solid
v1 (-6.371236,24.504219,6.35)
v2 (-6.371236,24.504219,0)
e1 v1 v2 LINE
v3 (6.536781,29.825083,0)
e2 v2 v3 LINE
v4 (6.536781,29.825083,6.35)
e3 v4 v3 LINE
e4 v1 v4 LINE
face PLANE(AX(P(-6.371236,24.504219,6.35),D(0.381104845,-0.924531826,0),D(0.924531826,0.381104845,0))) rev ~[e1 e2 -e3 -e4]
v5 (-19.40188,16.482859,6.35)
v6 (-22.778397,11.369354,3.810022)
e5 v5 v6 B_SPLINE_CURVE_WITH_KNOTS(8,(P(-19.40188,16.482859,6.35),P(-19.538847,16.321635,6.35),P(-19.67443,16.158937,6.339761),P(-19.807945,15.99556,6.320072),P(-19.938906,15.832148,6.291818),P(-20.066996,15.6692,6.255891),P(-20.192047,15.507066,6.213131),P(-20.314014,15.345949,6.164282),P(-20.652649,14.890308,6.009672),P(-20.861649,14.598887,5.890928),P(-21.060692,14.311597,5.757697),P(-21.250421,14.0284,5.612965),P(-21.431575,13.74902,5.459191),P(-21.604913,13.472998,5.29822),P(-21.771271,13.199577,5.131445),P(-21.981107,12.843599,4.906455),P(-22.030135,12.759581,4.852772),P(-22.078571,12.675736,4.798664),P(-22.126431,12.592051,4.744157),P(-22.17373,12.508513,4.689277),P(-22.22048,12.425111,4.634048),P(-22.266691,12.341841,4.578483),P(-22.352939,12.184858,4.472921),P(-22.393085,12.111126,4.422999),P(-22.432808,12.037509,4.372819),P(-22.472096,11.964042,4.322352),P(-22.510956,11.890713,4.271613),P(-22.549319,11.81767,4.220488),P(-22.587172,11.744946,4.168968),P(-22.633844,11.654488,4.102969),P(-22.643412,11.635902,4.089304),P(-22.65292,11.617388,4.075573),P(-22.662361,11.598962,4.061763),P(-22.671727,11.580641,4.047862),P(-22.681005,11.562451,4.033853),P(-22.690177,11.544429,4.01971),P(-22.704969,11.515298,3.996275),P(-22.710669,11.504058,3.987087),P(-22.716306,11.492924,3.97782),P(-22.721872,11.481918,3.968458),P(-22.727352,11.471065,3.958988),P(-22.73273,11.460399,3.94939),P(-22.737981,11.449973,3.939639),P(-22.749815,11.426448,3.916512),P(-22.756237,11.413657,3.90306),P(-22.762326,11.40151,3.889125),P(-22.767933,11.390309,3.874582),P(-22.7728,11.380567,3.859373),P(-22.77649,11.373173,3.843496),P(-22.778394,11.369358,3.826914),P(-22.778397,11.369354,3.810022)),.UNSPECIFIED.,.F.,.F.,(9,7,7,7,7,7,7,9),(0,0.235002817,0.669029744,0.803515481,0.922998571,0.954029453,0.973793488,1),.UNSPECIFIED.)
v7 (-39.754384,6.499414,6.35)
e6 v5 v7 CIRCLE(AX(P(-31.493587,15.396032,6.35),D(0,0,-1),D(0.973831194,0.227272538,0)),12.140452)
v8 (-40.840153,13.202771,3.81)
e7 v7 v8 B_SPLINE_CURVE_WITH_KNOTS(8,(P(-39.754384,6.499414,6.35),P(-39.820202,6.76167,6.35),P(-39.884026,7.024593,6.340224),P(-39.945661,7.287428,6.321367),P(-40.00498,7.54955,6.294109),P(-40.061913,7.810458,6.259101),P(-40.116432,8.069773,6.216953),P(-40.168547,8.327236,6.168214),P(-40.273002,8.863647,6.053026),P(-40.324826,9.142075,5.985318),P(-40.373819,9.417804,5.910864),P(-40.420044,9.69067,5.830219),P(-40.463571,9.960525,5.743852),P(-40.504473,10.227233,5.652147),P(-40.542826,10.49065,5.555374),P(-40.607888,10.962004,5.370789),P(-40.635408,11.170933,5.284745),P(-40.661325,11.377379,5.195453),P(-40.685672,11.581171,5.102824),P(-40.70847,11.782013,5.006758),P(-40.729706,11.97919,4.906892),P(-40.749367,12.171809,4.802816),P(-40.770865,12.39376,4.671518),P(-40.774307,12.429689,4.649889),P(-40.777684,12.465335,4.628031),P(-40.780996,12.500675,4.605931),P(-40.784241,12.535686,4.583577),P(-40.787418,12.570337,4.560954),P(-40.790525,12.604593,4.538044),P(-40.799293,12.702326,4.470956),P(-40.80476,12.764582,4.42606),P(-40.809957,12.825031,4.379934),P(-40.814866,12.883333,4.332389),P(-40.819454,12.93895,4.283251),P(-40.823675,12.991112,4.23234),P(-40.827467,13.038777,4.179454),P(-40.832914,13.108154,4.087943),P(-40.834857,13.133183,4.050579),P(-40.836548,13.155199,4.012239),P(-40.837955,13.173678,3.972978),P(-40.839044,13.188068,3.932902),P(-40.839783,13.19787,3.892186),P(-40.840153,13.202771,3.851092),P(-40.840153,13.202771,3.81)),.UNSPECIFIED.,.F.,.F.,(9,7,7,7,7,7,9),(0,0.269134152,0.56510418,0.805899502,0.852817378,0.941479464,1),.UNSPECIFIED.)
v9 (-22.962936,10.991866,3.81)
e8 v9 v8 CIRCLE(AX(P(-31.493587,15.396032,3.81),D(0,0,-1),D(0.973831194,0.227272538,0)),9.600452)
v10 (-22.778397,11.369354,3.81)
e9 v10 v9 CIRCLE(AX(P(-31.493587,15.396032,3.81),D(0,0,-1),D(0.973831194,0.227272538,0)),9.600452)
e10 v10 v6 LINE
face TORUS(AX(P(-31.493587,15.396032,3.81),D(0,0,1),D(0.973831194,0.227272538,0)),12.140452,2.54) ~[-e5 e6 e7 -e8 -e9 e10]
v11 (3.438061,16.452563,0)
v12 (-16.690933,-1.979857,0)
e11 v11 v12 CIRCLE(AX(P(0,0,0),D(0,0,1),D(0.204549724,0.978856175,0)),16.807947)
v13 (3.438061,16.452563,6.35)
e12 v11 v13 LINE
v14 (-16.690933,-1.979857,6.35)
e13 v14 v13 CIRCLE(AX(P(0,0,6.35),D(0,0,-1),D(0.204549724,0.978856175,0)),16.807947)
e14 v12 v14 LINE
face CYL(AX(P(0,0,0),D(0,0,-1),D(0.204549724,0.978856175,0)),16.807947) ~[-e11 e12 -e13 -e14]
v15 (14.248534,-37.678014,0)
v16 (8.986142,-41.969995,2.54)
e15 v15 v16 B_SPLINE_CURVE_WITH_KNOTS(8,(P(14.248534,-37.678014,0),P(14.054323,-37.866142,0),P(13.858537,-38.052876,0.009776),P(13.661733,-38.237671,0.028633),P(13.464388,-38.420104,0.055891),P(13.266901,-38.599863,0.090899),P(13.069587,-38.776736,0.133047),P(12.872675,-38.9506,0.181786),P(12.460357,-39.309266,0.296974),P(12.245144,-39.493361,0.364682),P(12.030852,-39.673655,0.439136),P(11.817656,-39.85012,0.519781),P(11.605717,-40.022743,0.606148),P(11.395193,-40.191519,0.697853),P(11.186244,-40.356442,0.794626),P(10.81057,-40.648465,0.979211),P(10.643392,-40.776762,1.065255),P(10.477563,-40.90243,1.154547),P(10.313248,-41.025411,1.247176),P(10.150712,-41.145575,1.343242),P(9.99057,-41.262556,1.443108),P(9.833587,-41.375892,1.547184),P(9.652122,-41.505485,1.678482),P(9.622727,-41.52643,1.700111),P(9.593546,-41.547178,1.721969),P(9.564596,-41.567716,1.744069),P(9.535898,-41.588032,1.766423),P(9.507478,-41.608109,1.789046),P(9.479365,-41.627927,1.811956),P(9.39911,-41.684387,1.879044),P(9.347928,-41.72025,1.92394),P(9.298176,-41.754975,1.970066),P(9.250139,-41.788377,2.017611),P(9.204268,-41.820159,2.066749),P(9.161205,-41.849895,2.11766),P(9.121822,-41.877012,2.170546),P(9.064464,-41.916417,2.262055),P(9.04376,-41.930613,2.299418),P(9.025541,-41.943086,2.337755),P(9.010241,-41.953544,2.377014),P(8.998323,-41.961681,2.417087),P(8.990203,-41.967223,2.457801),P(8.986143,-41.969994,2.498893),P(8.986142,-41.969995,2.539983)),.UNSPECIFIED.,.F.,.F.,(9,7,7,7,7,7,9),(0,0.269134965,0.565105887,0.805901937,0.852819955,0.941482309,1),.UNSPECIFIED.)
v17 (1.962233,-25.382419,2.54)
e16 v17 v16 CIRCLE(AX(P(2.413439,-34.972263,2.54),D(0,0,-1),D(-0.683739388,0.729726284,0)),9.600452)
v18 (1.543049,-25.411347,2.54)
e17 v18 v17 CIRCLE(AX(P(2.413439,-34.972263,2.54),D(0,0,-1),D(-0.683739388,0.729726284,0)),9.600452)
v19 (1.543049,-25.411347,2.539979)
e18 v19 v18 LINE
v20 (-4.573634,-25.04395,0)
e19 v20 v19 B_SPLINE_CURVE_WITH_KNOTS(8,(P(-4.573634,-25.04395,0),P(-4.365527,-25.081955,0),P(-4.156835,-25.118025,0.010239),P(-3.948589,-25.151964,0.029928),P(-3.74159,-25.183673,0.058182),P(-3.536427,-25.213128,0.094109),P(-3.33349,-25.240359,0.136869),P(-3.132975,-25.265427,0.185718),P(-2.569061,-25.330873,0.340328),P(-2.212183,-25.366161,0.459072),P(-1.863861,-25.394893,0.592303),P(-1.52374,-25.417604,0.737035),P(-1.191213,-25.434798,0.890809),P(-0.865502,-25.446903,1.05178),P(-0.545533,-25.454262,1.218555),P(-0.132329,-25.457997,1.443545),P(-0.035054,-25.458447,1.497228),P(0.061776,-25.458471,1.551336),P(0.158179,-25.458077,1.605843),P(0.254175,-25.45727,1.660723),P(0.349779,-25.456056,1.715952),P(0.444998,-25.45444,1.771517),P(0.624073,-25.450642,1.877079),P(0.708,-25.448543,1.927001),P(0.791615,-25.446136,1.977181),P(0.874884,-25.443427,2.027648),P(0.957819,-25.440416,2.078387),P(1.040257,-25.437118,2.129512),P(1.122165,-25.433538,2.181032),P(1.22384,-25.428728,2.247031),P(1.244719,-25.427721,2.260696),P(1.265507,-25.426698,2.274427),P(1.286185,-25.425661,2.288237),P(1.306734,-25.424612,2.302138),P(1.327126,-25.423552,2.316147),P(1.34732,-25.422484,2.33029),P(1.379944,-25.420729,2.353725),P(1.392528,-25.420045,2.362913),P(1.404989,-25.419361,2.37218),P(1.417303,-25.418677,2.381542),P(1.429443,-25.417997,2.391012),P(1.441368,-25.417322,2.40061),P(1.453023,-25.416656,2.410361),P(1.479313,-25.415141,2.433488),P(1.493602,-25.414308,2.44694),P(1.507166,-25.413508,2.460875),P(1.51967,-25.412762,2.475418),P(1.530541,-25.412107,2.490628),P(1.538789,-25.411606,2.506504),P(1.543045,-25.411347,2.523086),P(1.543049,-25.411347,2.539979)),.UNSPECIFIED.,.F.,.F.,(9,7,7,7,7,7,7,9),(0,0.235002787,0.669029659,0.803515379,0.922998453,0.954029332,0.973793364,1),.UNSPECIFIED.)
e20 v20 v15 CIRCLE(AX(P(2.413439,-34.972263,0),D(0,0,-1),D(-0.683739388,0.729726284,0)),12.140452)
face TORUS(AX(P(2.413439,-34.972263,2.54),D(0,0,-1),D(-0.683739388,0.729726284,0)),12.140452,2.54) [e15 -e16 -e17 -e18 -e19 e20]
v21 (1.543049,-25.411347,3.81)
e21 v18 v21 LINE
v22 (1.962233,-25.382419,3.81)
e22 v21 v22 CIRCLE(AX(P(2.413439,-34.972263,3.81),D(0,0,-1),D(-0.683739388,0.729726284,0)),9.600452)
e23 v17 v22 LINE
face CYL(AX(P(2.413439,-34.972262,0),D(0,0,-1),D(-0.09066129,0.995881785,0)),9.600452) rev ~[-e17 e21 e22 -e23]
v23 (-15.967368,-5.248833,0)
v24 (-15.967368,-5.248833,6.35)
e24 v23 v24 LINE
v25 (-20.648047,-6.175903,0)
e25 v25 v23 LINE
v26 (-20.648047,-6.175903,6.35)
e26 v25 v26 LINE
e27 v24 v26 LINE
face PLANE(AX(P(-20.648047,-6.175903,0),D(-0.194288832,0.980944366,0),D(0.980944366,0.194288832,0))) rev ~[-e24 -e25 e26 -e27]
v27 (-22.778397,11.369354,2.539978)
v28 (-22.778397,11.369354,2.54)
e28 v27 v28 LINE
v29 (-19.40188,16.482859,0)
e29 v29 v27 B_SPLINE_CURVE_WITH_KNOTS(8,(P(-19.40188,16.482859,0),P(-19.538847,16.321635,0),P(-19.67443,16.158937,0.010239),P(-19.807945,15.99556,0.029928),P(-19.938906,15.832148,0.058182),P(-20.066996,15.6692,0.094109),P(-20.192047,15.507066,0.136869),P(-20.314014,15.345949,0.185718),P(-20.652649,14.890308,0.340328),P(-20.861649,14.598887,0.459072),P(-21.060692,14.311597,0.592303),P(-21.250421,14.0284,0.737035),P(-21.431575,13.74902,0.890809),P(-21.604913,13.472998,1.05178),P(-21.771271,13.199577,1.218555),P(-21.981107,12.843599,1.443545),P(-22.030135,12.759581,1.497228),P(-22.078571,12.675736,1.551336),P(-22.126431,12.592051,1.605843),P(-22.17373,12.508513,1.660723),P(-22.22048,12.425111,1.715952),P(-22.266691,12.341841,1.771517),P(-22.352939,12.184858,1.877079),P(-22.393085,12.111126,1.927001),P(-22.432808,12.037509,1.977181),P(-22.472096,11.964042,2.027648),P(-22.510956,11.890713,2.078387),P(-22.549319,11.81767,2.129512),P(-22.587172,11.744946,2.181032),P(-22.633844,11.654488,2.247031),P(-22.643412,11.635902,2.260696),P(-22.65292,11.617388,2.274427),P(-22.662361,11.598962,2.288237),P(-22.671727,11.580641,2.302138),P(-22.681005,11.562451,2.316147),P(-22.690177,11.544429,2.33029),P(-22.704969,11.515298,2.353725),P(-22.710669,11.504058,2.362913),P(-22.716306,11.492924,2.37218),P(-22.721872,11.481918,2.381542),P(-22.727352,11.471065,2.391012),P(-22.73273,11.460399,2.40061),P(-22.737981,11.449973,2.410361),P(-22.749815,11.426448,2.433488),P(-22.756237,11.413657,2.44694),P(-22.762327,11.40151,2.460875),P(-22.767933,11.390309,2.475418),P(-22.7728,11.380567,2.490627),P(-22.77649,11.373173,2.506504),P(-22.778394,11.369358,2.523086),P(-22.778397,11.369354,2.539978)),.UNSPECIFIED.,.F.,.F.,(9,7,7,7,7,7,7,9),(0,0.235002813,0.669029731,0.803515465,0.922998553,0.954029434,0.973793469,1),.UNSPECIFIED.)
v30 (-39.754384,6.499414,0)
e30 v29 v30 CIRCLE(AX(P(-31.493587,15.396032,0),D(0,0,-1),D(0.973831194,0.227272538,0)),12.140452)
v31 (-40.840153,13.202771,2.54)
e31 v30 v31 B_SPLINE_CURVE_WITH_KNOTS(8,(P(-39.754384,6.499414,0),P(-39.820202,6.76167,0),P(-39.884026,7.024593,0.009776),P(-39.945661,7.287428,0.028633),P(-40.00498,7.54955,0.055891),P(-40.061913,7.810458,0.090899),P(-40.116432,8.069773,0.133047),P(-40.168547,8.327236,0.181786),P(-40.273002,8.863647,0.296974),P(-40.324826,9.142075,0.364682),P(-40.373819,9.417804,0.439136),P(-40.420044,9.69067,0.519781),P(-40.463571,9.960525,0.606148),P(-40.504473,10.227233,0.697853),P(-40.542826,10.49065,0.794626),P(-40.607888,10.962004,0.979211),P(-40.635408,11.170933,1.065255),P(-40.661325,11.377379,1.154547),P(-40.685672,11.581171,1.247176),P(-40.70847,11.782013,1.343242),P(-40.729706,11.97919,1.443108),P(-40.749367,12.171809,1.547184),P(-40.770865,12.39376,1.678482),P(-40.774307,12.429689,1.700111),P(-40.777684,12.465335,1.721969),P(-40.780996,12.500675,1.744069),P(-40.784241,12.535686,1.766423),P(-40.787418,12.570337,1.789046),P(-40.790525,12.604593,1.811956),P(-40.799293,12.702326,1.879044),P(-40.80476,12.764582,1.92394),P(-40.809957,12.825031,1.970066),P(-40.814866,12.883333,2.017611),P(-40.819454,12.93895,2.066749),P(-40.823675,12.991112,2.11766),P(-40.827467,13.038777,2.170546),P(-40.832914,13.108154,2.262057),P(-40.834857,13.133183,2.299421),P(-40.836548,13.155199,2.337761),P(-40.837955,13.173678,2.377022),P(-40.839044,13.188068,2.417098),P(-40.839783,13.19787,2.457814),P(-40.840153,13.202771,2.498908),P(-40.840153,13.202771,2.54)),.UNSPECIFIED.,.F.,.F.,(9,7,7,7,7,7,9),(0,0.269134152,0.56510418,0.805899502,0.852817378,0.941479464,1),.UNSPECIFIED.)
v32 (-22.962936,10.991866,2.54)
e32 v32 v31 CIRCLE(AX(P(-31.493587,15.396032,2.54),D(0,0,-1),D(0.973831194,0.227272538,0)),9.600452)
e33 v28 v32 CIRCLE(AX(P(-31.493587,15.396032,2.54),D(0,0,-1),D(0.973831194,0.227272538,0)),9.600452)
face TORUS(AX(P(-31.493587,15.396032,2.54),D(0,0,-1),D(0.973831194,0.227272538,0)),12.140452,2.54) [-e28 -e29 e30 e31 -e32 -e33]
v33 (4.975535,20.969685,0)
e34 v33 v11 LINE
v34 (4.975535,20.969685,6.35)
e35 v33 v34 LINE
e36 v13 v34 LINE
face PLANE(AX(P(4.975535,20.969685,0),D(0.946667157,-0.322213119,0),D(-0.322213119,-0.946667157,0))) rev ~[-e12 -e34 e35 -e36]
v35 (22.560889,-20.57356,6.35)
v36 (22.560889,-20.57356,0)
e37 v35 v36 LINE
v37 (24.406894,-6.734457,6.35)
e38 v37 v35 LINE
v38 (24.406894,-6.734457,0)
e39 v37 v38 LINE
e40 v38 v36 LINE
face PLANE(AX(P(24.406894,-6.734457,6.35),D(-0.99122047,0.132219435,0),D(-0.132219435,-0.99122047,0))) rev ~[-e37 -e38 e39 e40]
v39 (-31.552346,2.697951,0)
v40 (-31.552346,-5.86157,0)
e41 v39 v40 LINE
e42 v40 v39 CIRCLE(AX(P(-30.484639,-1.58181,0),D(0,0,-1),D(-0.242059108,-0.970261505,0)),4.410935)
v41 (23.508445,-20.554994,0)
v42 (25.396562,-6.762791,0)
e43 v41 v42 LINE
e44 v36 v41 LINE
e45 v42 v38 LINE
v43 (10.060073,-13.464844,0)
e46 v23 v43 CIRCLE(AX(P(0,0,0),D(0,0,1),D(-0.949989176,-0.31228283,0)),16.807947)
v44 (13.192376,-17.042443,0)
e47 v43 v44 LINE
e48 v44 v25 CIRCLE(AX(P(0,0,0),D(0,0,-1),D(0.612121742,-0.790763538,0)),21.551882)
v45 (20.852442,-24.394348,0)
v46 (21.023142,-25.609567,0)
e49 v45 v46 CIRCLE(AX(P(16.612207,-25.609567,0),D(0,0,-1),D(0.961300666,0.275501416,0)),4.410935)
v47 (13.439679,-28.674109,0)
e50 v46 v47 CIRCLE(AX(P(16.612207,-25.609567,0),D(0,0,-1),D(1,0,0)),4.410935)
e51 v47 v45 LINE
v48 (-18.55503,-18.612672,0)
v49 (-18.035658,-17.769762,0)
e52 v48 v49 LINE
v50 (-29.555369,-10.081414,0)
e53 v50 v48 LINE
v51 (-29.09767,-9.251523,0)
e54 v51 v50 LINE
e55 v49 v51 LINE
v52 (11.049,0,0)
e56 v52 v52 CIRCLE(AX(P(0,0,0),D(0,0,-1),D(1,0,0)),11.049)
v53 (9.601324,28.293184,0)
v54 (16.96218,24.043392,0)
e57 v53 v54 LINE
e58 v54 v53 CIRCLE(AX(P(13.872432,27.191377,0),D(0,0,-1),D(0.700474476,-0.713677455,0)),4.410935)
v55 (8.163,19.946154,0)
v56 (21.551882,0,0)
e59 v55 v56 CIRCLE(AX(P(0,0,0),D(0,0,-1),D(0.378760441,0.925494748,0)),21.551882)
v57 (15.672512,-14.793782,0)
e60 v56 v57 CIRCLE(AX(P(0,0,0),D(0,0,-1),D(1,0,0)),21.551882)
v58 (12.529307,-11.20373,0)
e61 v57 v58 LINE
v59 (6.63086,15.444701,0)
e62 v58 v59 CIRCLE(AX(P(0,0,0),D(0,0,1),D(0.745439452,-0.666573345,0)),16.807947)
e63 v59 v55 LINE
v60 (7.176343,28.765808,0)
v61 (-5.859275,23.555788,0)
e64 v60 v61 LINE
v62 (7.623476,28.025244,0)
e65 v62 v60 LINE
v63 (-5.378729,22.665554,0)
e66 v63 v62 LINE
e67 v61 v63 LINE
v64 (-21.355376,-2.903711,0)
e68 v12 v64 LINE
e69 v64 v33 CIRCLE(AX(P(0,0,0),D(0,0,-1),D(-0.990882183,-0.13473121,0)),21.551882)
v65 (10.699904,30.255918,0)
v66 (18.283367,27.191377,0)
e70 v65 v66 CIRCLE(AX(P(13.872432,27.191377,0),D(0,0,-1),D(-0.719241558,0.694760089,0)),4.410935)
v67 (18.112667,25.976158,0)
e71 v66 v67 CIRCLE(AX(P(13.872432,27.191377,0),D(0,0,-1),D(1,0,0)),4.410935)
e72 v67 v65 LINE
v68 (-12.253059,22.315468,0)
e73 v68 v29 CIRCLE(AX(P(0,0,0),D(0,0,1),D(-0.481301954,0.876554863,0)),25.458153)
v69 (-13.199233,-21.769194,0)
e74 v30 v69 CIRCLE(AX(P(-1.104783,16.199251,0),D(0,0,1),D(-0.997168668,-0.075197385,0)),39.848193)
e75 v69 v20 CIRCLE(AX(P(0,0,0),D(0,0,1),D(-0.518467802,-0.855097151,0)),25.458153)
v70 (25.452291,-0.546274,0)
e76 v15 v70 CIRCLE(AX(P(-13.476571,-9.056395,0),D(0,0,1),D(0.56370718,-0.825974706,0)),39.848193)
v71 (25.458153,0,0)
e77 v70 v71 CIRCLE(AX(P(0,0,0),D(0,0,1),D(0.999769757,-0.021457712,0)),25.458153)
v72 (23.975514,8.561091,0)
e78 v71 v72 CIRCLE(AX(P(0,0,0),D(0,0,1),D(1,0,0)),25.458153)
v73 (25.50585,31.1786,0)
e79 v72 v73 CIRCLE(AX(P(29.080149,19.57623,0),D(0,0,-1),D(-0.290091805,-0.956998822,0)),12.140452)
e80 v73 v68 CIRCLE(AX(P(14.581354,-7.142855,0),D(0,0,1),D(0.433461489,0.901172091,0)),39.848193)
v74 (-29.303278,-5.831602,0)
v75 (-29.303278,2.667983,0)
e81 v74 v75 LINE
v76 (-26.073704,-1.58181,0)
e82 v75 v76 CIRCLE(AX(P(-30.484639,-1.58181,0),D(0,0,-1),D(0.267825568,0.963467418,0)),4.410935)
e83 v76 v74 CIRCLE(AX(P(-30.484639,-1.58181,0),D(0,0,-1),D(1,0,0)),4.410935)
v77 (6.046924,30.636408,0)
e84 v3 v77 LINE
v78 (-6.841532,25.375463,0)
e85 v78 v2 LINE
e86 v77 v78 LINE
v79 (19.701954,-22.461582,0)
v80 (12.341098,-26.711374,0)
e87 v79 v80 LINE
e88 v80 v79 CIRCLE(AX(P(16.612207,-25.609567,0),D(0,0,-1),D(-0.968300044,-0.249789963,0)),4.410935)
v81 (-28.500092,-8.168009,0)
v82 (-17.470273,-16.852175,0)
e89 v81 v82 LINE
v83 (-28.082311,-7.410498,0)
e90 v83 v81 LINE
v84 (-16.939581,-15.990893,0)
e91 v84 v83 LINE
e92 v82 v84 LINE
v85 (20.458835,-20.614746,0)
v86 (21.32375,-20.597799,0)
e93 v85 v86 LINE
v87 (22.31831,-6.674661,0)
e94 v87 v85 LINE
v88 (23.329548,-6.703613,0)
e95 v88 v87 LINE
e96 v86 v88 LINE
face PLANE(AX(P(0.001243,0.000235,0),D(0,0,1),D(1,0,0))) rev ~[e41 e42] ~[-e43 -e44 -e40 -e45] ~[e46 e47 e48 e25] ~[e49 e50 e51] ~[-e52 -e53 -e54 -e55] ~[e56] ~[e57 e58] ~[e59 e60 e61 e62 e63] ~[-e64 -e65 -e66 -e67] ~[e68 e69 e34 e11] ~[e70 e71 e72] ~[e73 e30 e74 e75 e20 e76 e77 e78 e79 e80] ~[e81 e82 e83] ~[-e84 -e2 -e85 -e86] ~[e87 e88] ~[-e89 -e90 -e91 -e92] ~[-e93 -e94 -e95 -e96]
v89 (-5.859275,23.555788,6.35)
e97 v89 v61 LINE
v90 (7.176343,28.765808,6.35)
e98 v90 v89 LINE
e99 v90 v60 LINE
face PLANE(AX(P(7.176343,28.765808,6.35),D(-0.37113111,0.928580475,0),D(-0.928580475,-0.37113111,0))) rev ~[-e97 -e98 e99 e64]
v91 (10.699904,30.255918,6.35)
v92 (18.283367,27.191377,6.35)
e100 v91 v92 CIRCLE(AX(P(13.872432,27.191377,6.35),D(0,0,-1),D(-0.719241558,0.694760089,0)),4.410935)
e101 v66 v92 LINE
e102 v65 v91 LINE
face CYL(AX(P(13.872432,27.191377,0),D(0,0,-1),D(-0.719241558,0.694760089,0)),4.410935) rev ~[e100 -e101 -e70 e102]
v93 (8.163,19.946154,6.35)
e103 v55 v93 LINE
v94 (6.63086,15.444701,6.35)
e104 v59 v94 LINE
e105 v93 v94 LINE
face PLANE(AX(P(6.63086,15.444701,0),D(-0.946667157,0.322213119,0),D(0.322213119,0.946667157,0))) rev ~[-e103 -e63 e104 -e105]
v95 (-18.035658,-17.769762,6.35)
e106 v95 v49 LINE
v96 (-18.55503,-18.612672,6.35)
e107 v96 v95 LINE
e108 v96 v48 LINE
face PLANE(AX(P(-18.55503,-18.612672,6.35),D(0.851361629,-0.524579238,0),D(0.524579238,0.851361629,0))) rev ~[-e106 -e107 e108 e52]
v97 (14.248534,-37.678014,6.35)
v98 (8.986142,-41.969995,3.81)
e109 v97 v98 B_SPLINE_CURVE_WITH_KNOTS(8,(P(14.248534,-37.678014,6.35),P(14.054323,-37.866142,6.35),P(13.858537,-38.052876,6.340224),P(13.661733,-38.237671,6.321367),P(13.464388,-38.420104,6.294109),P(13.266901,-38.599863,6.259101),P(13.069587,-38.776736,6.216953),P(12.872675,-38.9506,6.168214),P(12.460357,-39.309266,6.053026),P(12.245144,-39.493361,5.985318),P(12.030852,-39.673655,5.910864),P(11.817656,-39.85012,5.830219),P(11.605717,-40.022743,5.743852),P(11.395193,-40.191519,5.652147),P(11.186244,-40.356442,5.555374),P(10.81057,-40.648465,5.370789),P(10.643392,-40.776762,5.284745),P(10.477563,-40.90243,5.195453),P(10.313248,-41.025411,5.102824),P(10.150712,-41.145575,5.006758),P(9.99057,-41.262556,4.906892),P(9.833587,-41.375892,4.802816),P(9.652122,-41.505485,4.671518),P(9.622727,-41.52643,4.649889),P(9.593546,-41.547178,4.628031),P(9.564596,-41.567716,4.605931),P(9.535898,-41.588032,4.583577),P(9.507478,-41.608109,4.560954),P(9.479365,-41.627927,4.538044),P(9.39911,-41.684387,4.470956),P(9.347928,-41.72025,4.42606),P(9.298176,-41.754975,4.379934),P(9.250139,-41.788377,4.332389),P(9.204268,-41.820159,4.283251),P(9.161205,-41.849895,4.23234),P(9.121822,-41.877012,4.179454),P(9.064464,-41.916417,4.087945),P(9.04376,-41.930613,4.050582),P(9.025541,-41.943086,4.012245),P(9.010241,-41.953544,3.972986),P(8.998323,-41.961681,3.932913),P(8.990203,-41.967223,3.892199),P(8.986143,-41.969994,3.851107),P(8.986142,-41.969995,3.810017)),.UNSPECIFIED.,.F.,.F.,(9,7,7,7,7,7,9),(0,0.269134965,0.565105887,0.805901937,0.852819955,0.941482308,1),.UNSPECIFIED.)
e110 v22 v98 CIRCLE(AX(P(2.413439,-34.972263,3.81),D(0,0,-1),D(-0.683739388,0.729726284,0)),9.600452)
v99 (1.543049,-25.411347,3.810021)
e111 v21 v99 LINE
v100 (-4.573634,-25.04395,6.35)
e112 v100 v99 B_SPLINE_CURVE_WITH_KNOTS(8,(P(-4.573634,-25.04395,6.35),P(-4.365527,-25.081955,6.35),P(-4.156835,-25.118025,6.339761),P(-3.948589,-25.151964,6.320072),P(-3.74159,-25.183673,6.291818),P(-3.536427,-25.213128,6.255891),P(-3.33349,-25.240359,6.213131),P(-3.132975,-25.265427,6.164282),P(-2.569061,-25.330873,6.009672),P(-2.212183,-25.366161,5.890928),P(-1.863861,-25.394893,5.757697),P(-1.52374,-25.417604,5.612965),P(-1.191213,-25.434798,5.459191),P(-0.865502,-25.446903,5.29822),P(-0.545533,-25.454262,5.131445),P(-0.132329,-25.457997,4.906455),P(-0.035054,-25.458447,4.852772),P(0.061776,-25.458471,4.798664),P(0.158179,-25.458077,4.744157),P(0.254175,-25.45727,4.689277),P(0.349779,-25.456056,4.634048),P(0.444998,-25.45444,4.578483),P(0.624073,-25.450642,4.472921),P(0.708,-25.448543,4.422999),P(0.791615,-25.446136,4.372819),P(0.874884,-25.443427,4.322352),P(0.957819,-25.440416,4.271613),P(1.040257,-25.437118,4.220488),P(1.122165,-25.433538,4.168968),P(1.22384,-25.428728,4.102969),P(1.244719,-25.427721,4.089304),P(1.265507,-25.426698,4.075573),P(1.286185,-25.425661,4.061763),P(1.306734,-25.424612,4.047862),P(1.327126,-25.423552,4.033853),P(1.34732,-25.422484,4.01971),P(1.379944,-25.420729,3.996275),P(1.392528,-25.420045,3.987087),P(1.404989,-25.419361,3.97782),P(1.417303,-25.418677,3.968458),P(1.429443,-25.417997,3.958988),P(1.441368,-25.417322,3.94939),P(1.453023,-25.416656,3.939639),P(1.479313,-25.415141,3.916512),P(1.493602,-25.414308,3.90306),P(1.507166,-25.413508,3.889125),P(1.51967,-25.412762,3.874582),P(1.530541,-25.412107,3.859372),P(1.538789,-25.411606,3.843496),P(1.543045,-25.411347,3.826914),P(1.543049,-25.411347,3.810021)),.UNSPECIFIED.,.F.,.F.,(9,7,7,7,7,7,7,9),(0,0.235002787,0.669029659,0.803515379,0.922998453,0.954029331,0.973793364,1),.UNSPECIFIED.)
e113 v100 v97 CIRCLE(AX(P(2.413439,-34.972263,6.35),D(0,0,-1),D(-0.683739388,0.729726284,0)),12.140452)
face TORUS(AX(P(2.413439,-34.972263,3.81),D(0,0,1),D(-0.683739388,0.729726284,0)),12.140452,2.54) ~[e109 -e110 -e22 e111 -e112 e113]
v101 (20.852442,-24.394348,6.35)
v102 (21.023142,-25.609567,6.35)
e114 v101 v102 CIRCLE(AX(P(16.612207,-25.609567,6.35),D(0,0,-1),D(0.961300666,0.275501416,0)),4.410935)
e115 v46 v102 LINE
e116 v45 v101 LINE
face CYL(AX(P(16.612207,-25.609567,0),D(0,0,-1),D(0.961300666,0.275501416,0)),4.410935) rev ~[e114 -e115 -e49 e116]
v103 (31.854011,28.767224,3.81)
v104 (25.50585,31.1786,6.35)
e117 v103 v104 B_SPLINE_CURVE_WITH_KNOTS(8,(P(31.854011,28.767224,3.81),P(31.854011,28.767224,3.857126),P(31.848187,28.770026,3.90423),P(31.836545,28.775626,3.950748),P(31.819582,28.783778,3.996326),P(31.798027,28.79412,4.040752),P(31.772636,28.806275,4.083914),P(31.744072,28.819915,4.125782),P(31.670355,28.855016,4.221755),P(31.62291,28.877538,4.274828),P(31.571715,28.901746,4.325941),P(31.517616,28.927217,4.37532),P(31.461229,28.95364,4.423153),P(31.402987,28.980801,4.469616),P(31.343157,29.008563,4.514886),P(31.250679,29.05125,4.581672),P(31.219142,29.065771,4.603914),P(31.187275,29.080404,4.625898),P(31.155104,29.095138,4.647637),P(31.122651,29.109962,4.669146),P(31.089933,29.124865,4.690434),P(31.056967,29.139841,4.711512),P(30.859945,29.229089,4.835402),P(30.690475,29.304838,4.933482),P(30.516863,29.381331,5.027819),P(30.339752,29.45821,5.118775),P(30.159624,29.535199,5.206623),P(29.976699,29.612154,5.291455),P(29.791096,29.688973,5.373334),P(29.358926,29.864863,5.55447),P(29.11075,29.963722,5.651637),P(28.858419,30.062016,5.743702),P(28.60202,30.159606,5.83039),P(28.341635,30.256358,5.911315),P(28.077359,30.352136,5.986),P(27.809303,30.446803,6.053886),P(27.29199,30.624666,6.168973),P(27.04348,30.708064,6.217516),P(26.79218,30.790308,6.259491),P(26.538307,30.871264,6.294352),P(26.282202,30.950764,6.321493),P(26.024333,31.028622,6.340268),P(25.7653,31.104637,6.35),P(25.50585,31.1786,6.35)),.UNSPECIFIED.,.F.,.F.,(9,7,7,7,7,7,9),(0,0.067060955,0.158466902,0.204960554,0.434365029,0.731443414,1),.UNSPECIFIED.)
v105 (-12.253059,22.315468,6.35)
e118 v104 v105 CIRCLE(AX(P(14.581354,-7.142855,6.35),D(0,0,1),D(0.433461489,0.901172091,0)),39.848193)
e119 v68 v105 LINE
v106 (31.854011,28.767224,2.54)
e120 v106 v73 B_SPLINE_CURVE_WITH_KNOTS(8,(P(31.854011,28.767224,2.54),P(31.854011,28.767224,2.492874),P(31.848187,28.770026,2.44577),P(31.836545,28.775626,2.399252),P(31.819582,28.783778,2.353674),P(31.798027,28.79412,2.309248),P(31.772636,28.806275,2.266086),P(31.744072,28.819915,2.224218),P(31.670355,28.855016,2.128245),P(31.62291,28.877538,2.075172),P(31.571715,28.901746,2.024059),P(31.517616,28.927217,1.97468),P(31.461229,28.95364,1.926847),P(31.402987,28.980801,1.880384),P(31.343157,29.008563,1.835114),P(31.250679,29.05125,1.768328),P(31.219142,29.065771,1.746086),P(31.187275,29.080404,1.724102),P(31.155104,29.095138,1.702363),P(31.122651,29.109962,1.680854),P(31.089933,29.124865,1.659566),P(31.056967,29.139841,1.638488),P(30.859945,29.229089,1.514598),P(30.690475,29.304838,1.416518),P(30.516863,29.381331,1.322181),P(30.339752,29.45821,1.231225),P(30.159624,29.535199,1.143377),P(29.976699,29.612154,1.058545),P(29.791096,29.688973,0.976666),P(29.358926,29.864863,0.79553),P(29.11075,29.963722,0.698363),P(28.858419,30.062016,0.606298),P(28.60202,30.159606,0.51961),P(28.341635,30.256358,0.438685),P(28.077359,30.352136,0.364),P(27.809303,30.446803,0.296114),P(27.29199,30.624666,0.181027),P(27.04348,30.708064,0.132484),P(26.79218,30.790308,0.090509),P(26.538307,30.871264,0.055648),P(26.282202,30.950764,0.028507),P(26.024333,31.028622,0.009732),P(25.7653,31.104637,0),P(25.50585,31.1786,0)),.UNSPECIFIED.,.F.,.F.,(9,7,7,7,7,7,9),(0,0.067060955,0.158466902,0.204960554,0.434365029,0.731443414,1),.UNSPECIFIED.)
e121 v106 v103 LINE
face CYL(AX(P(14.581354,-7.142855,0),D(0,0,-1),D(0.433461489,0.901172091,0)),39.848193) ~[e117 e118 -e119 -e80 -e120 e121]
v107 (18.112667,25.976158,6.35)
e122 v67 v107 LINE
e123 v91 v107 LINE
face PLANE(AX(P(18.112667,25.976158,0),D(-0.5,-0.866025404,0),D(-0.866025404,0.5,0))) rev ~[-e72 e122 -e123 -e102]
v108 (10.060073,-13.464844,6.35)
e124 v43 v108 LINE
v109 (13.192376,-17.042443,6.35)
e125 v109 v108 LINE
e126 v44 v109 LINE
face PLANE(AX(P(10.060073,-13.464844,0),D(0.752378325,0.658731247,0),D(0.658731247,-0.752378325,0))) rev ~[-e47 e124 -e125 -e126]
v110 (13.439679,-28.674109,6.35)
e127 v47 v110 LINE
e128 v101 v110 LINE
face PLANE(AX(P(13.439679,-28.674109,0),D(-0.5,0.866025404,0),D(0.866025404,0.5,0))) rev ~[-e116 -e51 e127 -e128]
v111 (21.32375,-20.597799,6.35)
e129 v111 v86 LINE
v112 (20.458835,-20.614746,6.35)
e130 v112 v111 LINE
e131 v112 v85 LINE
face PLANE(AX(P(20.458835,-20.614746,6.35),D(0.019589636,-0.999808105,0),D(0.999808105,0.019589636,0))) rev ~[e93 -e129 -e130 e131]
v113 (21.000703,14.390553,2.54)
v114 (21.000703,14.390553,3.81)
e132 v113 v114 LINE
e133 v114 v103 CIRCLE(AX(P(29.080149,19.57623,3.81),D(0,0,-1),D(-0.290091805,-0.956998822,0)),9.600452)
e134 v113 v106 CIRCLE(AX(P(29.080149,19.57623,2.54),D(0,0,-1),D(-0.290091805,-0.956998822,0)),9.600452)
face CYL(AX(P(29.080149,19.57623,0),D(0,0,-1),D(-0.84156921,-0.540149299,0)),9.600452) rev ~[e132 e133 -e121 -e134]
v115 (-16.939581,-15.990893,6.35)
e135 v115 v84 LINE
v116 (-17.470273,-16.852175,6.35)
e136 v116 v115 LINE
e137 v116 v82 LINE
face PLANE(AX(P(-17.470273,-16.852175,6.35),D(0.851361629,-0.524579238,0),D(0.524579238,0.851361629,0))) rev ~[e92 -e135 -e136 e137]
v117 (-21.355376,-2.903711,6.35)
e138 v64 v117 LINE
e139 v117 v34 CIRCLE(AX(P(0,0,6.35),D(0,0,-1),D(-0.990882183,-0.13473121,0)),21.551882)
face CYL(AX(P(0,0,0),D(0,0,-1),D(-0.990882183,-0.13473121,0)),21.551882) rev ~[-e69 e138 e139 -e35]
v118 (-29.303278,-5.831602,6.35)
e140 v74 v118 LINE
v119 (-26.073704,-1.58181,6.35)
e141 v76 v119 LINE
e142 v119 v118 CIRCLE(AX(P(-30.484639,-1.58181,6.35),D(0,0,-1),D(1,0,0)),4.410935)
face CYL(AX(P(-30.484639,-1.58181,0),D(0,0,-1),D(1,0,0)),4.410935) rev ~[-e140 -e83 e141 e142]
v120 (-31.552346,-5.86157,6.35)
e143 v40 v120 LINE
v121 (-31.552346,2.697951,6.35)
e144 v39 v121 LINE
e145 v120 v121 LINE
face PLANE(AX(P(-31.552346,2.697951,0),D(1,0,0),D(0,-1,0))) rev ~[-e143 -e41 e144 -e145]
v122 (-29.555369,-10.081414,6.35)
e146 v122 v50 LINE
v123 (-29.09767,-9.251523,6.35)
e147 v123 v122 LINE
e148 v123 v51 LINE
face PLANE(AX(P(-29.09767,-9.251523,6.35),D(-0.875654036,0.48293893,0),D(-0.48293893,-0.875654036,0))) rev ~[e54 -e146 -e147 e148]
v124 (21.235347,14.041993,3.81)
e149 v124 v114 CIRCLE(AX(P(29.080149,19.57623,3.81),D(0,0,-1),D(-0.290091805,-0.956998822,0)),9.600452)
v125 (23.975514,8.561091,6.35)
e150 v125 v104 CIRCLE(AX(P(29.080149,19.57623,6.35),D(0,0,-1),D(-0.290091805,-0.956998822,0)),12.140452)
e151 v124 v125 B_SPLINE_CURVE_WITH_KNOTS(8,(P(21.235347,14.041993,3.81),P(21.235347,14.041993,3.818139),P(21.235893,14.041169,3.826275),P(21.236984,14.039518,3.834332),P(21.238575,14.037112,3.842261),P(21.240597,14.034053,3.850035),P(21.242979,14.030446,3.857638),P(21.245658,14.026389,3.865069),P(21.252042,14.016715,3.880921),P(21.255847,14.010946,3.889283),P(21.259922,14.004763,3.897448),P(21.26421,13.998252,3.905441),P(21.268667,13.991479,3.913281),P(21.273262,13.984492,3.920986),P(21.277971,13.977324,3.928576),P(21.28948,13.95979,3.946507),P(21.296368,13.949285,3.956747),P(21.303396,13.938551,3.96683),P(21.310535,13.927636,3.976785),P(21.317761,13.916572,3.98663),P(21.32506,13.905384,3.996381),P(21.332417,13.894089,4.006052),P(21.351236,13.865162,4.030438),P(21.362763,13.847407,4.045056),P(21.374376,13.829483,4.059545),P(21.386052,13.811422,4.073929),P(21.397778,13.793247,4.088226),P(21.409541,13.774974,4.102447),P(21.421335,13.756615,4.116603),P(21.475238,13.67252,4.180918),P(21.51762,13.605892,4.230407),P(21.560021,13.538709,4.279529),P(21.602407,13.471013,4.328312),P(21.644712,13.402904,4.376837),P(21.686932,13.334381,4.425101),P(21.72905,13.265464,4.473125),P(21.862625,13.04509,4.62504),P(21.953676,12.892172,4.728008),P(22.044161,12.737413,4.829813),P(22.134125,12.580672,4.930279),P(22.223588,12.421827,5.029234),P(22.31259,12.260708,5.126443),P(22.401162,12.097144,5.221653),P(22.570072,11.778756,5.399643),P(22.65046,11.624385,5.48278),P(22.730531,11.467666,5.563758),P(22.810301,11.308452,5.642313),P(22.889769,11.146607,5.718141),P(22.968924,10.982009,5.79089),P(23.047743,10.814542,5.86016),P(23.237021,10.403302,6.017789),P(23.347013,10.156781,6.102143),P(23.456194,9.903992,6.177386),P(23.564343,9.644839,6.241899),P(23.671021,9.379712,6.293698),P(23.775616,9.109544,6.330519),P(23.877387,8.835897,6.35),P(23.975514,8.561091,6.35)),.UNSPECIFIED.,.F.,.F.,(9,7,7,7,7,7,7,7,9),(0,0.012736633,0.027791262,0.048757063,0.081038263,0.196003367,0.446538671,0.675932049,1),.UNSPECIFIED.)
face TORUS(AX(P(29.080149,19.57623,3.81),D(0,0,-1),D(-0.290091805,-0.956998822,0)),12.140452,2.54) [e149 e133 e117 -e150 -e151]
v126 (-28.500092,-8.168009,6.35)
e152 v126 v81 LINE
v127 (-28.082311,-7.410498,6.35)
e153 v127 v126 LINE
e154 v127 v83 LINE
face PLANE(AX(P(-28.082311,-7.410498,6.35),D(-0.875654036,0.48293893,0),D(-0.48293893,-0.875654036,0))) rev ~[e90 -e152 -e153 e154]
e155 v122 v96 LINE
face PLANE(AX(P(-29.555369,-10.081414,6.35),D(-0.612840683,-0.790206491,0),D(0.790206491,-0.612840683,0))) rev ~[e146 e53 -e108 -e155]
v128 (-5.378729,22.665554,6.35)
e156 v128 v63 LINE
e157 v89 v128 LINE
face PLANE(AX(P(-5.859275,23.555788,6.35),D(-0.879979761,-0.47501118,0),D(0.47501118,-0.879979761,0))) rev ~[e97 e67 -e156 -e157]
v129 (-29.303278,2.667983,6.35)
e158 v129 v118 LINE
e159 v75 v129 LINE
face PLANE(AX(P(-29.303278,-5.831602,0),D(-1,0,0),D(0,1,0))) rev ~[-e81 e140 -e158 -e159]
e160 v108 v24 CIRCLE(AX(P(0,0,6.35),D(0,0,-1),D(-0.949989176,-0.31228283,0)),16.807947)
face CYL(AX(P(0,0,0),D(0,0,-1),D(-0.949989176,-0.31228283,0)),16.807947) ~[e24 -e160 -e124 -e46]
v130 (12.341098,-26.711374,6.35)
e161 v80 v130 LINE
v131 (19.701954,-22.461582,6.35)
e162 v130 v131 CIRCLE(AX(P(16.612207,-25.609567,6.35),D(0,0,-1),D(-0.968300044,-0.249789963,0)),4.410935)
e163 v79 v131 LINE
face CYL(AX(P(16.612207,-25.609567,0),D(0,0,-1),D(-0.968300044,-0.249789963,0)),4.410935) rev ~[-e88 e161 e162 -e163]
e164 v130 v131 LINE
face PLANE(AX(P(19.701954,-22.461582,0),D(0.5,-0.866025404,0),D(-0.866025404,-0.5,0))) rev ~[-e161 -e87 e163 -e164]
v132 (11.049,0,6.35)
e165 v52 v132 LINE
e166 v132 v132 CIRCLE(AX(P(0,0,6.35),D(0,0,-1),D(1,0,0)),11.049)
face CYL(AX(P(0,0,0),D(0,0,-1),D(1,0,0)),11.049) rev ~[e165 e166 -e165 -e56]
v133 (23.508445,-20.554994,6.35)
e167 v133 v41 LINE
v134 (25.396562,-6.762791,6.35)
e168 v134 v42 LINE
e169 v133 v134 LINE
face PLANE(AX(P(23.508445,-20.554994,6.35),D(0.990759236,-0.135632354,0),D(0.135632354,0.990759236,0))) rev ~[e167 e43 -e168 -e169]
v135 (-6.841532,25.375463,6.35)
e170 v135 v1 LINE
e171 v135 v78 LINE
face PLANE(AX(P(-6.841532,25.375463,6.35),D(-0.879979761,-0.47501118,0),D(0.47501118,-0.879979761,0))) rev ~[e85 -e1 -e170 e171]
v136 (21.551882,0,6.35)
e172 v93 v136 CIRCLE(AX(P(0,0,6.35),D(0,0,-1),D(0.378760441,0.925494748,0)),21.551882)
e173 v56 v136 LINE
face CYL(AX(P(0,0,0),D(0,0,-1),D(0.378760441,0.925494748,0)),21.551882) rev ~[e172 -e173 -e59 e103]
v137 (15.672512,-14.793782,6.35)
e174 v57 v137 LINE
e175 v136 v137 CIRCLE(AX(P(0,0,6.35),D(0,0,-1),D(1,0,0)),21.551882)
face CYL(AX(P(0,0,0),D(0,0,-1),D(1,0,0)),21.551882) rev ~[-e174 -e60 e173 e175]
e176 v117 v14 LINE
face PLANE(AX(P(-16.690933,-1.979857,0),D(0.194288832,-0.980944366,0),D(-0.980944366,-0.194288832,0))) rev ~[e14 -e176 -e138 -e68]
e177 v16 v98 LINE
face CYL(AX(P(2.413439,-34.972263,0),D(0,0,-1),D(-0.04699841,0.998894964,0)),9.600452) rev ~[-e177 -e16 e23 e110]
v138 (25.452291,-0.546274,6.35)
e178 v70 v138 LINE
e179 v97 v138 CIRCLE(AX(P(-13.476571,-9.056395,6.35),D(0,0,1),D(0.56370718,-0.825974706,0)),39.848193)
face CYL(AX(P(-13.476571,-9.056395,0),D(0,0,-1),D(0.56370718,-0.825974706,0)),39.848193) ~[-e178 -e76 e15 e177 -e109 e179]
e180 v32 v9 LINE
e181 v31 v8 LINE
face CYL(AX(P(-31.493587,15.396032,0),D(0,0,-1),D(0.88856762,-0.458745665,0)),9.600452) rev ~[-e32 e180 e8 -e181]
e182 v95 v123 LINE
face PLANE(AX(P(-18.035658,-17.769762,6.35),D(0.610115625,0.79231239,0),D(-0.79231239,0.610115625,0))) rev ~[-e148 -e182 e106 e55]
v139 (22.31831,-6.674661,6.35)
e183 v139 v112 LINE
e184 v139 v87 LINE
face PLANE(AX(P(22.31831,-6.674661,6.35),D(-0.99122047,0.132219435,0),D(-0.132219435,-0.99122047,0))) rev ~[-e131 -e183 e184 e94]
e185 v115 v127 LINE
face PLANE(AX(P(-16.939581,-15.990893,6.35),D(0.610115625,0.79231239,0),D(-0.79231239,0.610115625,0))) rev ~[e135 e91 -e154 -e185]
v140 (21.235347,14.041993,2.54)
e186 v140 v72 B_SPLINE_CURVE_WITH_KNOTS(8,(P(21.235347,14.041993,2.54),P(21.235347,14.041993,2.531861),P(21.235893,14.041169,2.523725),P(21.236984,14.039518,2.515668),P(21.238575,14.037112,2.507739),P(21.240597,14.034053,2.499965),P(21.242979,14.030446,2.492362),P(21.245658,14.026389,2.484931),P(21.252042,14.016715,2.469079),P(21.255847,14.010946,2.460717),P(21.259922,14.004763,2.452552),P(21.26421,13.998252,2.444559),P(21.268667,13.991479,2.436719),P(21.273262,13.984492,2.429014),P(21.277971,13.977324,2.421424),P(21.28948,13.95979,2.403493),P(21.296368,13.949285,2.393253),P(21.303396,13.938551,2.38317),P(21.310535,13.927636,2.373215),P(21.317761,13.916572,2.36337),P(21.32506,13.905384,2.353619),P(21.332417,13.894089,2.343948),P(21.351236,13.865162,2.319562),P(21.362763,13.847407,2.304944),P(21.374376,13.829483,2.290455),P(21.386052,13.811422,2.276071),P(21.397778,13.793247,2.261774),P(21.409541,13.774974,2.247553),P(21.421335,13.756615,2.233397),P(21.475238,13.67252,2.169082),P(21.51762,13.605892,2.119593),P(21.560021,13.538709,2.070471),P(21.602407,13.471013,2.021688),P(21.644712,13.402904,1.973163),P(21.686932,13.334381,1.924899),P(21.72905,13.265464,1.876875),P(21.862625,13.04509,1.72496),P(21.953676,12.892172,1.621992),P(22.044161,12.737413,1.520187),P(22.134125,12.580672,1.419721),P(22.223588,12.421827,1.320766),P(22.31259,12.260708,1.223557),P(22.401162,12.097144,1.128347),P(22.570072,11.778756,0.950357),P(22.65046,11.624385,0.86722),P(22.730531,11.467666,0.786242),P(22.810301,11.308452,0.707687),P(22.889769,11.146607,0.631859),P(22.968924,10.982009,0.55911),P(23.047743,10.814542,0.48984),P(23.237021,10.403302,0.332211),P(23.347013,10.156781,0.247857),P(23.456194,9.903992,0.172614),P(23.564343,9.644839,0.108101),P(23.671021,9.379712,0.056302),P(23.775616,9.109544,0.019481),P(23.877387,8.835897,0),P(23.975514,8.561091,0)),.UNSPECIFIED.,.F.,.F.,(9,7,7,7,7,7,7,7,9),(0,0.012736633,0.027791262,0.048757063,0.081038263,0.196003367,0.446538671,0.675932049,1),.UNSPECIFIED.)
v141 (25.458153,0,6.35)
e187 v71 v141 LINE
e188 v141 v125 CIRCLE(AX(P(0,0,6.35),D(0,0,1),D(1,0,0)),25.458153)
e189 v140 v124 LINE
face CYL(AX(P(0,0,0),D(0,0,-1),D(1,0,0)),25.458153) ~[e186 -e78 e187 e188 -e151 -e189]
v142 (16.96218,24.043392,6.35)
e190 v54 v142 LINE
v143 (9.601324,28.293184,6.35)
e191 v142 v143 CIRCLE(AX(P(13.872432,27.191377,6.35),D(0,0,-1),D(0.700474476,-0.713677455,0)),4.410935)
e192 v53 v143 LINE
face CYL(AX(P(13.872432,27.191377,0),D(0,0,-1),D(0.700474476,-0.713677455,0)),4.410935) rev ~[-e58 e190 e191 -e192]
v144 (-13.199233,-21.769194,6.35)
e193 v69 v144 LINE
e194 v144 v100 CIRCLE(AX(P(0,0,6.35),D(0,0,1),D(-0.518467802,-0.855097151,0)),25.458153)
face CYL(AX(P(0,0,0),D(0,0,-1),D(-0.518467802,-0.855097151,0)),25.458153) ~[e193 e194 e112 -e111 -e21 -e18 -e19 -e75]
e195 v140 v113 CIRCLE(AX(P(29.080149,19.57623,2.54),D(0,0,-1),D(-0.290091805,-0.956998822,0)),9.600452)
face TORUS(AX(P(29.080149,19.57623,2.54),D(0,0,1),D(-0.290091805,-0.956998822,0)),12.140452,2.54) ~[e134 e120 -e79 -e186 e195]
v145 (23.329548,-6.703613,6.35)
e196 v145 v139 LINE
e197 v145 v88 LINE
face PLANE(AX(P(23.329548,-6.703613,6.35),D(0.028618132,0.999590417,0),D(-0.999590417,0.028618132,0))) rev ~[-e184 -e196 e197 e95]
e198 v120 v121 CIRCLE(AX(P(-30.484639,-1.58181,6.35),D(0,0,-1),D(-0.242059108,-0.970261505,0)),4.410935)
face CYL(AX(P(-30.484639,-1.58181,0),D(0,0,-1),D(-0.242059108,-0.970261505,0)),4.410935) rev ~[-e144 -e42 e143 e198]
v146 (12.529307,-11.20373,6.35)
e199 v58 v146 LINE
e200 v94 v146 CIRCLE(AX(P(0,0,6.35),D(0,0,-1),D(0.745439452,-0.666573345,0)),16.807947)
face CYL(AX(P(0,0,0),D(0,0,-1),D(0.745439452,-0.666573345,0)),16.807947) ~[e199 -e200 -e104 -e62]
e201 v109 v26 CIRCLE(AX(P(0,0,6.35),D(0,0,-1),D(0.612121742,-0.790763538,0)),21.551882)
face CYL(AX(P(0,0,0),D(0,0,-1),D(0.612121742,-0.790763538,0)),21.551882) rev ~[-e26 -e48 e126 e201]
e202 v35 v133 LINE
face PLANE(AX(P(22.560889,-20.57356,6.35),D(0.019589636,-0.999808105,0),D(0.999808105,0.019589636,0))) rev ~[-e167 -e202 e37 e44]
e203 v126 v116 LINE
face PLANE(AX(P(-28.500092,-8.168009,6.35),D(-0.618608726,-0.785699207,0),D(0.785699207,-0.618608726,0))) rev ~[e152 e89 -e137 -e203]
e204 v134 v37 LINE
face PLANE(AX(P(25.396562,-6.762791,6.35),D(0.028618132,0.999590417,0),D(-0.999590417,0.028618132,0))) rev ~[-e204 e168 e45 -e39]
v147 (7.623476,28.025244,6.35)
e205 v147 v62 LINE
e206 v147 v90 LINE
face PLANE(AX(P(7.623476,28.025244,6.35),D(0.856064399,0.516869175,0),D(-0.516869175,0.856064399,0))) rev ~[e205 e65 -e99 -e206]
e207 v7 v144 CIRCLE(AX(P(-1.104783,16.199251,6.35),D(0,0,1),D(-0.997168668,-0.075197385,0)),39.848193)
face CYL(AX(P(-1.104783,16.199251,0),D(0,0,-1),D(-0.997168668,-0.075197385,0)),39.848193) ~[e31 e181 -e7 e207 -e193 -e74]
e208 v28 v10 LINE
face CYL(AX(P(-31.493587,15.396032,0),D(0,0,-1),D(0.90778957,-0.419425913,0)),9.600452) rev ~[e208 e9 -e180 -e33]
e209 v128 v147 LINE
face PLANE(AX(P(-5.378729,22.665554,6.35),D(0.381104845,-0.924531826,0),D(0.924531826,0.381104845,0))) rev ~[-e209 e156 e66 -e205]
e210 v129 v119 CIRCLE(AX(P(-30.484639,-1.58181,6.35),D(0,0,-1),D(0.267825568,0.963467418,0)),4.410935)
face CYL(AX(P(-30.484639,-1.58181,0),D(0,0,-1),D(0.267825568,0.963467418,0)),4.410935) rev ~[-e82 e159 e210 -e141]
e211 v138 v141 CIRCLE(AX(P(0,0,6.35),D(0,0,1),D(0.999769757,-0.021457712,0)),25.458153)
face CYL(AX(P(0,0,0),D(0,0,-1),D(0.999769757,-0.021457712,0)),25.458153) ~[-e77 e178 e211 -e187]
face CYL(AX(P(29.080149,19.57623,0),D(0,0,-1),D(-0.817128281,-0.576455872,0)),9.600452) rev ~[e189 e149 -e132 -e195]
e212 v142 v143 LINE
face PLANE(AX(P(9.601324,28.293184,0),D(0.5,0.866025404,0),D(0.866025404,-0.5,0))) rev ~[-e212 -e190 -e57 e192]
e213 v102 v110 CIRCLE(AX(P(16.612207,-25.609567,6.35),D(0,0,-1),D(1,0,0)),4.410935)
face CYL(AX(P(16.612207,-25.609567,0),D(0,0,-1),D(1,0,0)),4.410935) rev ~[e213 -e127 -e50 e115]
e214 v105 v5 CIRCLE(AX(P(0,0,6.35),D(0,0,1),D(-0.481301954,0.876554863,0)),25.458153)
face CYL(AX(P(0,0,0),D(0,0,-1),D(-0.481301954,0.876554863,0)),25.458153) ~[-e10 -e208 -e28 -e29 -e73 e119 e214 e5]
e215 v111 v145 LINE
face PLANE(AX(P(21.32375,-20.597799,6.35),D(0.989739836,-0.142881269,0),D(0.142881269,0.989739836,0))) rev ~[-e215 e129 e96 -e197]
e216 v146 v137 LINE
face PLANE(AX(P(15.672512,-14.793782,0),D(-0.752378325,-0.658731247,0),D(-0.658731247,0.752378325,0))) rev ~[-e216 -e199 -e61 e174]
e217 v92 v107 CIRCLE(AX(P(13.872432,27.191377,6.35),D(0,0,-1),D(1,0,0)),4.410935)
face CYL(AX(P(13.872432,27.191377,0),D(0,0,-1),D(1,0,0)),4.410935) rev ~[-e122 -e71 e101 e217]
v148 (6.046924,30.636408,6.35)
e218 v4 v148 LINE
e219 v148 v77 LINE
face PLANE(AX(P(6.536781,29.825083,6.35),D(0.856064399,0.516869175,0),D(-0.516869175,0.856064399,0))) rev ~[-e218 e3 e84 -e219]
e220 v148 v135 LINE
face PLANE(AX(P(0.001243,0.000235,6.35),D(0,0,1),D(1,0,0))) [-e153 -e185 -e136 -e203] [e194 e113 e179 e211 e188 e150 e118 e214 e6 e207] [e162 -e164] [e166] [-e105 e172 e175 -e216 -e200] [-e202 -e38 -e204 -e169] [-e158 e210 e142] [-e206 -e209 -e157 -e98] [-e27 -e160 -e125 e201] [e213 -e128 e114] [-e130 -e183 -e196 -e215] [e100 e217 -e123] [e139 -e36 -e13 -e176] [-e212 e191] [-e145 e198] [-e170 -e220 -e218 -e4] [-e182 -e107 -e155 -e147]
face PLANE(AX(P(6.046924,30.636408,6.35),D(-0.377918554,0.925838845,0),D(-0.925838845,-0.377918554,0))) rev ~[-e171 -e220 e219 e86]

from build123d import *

# Parameters (mm, degrees)
F1_DEPTH     = 6.35
F2_R         = 11.049
F3_DEPTH     = 25.4
F5_DEPTH     = 25.4
F7_DEPTH     = 25.4
F8_T2_ANGLE  = 244.4198027275
F8_T4_ANGLE  = 244.4198027276
F8_T6_ANGLE  = 244.4198027276
F8_T8_ANGLE  = 244.4198027276
F8_T10_ANGLE = 244.4198027275
F8_T12_ANGLE = 244.4198027276
F9_R         = 11.2522
F10_DEPTH    = 25.4
F12_DEPTH    = 25.4


# Not quite as in the source:
# - a fillet or chamfer that OpenCascade refuses, or shapes differently, is made with other operations: its cross-section is extruded or revolved along the edge and cut away or added


with BuildPart() as f1:
    # F0 (on Top) → F1 (new body)
    with BuildSketch(Plane.XY):
        with BuildLine():
            ThreePointArc((25.4522914495, -0.5462737247), (25.4566875826, -0.2731525857), (25.4581530165, 0))
            ThreePointArc((25.4581530165, 0), (24.3796049896, 7.3316038874), (21.2353474165, 14.0419932742))
            ThreePointArc((21.2353474165, 14.0419932742), (21.1161182893, 14.2149891818), (21.000703446, 14.3905527964))
            ThreePointArc((21.000703446, 14.3905527964), (5.9018125459, 24.7646151532), (-12.2530588017, 22.3154678422))
            ThreePointArc((-12.2530588017, 22.3154678422), (-18.3508874647, 17.6454663942), (-22.7783966035, 11.3693536837))
            ThreePointArc((-22.7783966035, 11.3693536837), (-22.8686008906, 11.1796002769), (-22.9629360192, 10.9918662834))
            ThreePointArc((-22.9629360192, 10.9918662834), (-24.3976921105, -7.2711879835), (-13.1992326478, -21.7691941174))
            ThreePointArc((-13.1992326478, -21.7691941174), (-6.1059784266, -24.7150679236), (1.543049187, -25.411346958))
            ThreePointArc((1.543049187, -25.411346958), (1.7524826013, -25.3945894587), (1.9622325732, -25.3824190798))
            ThreePointArc((1.9622325732, -25.3824190798), (18.4958795647, -17.4934271697), (25.4522914495, -0.5462737247))
        make_face()
        with BuildLine():
            ThreePointArc((-40.840152687, 13.2027706404), (-32.3672544542, -8.5097837592), (-13.1992326478, -21.7691941174))
            ThreePointArc((-13.1992326478, -21.7691941174), (-24.3976921105, -7.2711879835), (-22.9629360192, 10.9918662834))
            ThreePointArc((-22.9629360192, 10.9918662834), (-32.671913716, 5.8681661373), (-40.840152687, 13.2027706404))
        make_face()
        with BuildLine():
            ThreePointArc((-12.2530588017, 22.3154678422), (5.9018125459, 24.7646151532), (21.000703446, 14.3905527964))
            ThreePointArc((21.000703446, 14.3905527964), (21.4179378065, 25.3606241997), (31.8540111184, 28.7672244012))
            ThreePointArc((31.8540111184, 28.7672244012), (8.8139383109, 32.2857564877), (-12.2530588017, 22.3154678422))
        make_face()
        with BuildLine():
            ThreePointArc((8.9861415686, -41.9699950416), (23.5533161433, -23.7759727285), (25.4522914495, -0.5462737247))
            ThreePointArc((25.4522914495, -0.5462737247), (18.4958795647, -17.4934271697), (1.9622325732, -25.3824190798))
            ThreePointArc((1.9622325732, -25.3824190798), (11.2539759095, -31.2287903369), (8.9861415686, -41.9699950416))
        make_face()
    extrude(amount=F1_DEPTH)

    # F2 (on face) → F3 (cut)
    with BuildSketch(Plane(origin=(0, 0, 0), x_dir=(1, 0, 0), z_dir=(0, 0, -1))):
        Circle(F2_R)
    extrude(amount=-F3_DEPTH, mode=Mode.SUBTRACT)

    # F4 (on face) → F5 (cut)
    with BuildSketch(Plane(origin=(0, 0, 0), x_dir=(1, 0, 0), z_dir=(0, 0, -1))):
        with BuildLine():
            ThreePointArc((-15.9673679457, 5.2488333315), (-5.0596183633, 16.0283296844), (10.0600734805, 13.4648435572))
            Line((10.0600734805, 13.4648435572), (13.19237559, 17.0424425012))
            ThreePointArc((13.19237559, 17.0424425012), (-6.5891713979, 20.5199035183), (-20.6480469686, 6.1759028892))
            Line((-20.6480469686, 6.1759028892), (-15.9673679457, 5.2488333315))
        make_face()
        with BuildLine():
            ThreePointArc((12.5293069781, 11.2037296068), (15.7018951262, 5.9964639497), (16.8079472409, 0))
            ThreePointArc((16.8079472409, 0), (14.03492488, -9.2481335449), (6.6308598383, -15.4447009767))
            Line((6.6308598383, -15.4447009767), (8.1630003536, -19.9461536478))
            ThreePointArc((8.1630003536, -19.9461536478), (17.8942957524, -12.0115694078), (21.551882055, 0))
            ThreePointArc((21.551882055, 0), (20.0281771041, 7.9596320267), (15.6725122776, 14.7937817687))
            Line((15.6725122776, 14.7937817687), (12.5293069781, 11.2037296068))
        make_face()
        with BuildLine():
            Line((4.975534691, -20.9696846579), (3.4380609675, -16.4525629383))
            ThreePointArc((3.4380609675, -16.4525629383), (-11.3511315053, -12.3959228782), (-16.6909333188, 1.9798574195))
            Line((-16.6909333188, 1.9798574195), (-21.3553759436, 2.9037111466))
            ThreePointArc((-21.3553759436, 2.9037111466), (-14.4761720311, -15.9663415797), (4.975534691, -20.9696846579))
        make_face()
    extrude(amount=-F5_DEPTH, mode=Mode.SUBTRACT)

    # F6 (on face) → F7 (cut)
    with BuildSketch(Plane(origin=(0, 0, 0), x_dir=(1, 0, 0), z_dir=(0, 0, -1))):
        with BuildLine():
            Line((-31.5523461387, -2.6979510549), (-31.5523461387, 5.8615701514))
            ThreePointArc((-31.5523461387, 5.8615701514), (-34.8955742826, 1.5818095483), (-31.5523461387, -2.6979510549))
        make_face()
        with BuildLine():
            ThreePointArc((-29.303277888, -2.6679827758), (-26.9727125071, -1.0870330259), (-26.0737039307, 1.5818095483))
            ThreePointArc((-26.0737039307, 1.5818095483), (-26.9727125071, 4.2506521224), (-29.303277888, 5.8316018723))
            Line((-29.303277888, 5.8316018723), (-29.303277888, -2.6679827758))
        make_face()
        with BuildLine():
            ThreePointArc((20.8524417265, 24.3943482294), (20.9802584593, 24.9959924433), (21.023141982, 25.6095671174))
            ThreePointArc((21.023141982, 25.6095671174), (18.2648613778, 29.6991981513), (13.4396789177, 28.6741088325))
            Line((13.4396789177, 28.6741088325), (20.8524417265, 24.3943482294))
        make_face()
        with BuildLine():
            Line((19.7019543101, 22.461582129), (12.3410980833, 26.711374453))
            ThreePointArc((12.3410980833, 26.711374453), (14.4067392181, 21.7895852006), (19.7019543101, 22.461582129))
        make_face()
        with BuildLine():
            Line((9.6013235778, -28.2931840013), (16.9621798046, -24.0433916772))
            ThreePointArc((16.9621798046, -24.0433916772), (11.6669647126, -23.3713947489), (9.6013235778, -28.2931840013))
        make_face()
        with BuildLine():
            ThreePointArc((10.6999044122, -30.2559183808), (15.5250868723, -31.2810076995), (18.2833674765, -27.1913766657))
            ThreePointArc((18.2833674765, -27.1913766657), (18.2404839539, -26.5778019915), (18.112667221, -25.9761577777))
            Line((18.112667221, -25.9761577777), (10.6999044122, -30.2559183808))
        make_face()
    extrude(amount=-F7_DEPTH, mode=Mode.SUBTRACT)

    # F8: fillet of radius 2.54 on 6 edges, made by hand

    # F8_s1 → F8_t2 (revolve, cut)
    with BuildSketch(Plane(origin=(-16.1639945801, -15.1453497234, 0), x_dir=(0, 0, 1), z_dir=(-0.7297262835, -0.6837393883, 0))):
        with BuildLine():
            ThreePointArc((6.35, -15.029889874), (5.6060512242, -16.8259410982), (3.81, -17.569889874))
            Line((3.81, -17.569889874), (6.35, -17.569889874))
            Line((6.35, -17.569889874), (6.35, -15.029889874))
        make_face()
    revolve(axis=Axis((2.4134385694, -34.9722625532, 6.35), (0, 0, -1)), revolution_arc=F8_T2_ANGLE, mode=Mode.SUBTRACT)

    # F8_s3 → F8_t4 (revolve, cut)
    with BuildSketch(Plane(origin=(-5.0342603196, 21.5711047947, 0), x_dir=(0, 0, 1), z_dir=(-0.2272725381, 0.9738311935, 0))):
        with BuildLine():
            ThreePointArc((6.35, -15.029889874), (5.6060512242, -16.8259410982), (3.81, -17.569889874))
            Line((3.81, -17.569889874), (6.35, -17.569889874))
            Line((6.35, -17.569889874), (6.35, -15.029889874))
        make_face()
    revolve(axis=Axis((-31.4935870836, 15.396032165, 6.35), (0, 0, -1)), revolution_arc=F8_T4_ANGLE, mode=Mode.SUBTRACT)

    # F8_s5 → F8_t6 (revolve, cut)
    with BuildSketch(Plane(origin=(21.1982548997, -6.4257550714, 0), x_dir=(0, 0, 1), z_dir=(0.9569988216, -0.2900918052, 0))):
        with BuildLine():
            ThreePointArc((3.81, -17.569889874), (5.6060512242, -16.8259410982), (6.35, -15.029889874))
            Line((6.35, -15.029889874), (6.35, -17.569889874))
            Line((6.35, -17.569889874), (3.81, -17.569889874))
        make_face()
    revolve(axis=Axis((29.0801485142, 19.5762303882, 6.35), (0, 0, -1)), revolution_arc=F8_T6_ANGLE, mode=Mode.SUBTRACT)

    # F8_s7 → F8_t8 (revolve, cut)
    with BuildSketch(Plane(origin=(-5.0342603196, 21.5711047947, 0), x_dir=(0, 0, 1), z_dir=(-0.2272725381, 0.9738311935, 0))):
        with BuildLine():
            ThreePointArc((0, -15.029889874), (0.7439487758, -16.8259410982), (2.54, -17.569889874))
            Line((2.54, -17.569889874), (0, -17.569889874))
            Line((0, -17.569889874), (0, -15.029889874))
        make_face()
    revolve(axis=Axis((-31.4935870836, 15.396032165, 0), (0, 0, -1)), revolution_arc=F8_T8_ANGLE, mode=Mode.SUBTRACT)

    # F8_s9 → F8_t10 (revolve, cut)
    with BuildSketch(Plane(origin=(-16.1639945801, -15.1453497234, 0), x_dir=(0, 0, 1), z_dir=(-0.7297262835, -0.6837393883, 0))):
        with BuildLine():
            ThreePointArc((0, -15.029889874), (0.7439487758, -16.8259410982), (2.54, -17.569889874))
            Line((2.54, -17.569889874), (0, -17.569889874))
            Line((0, -17.569889874), (0, -15.029889874))
        make_face()
    revolve(axis=Axis((2.4134385694, -34.9722625532, 0), (0, 0, -1)), revolution_arc=F8_T10_ANGLE, mode=Mode.SUBTRACT)

    # F8_s11 → F8_t12 (revolve, cut)
    with BuildSketch(Plane(origin=(21.1982548997, -6.4257550714, 0), x_dir=(0, 0, 1), z_dir=(0.9569988216, -0.2900918052, 0))):
        with BuildLine():
            ThreePointArc((2.54, -17.569889874), (0.7439487758, -16.8259410982), (0, -15.029889874))
            Line((0, -15.029889874), (0, -17.569889874))
            Line((0, -17.569889874), (2.54, -17.569889874))
        make_face()
    revolve(axis=Axis((29.0801485142, 19.5762303882, 0), (0, 0, -1)), revolution_arc=F8_T12_ANGLE, mode=Mode.SUBTRACT)

    # F9 (on Top) → F10 (cut)
    with BuildSketch(Plane.XY):
        Circle(F9_R)
    extrude(amount=-F10_DEPTH, mode=Mode.SUBTRACT)

    # F11 (on face) → F12 (cut)
    with BuildSketch(Plane.XY.offset(6.35)):
        Polygon((6.5367808275, 29.8250825475), (6.0469240758, 30.6364076297), (-6.8415322731, 25.3754631249), (-6.3712364353, 24.5042187493), align=None)
        Polygon((7.6234762433, 28.0252436261), (7.1763426779, 28.7658084453), (-5.8592754632, 23.5557878219), (-5.3787292375, 22.6655541377), align=None)
        Polygon((22.5608887424, -20.5735595293), (23.5084452502, -20.5549936793), (25.3965618355, -6.7627908131), (24.4068941544, -6.7344567681), align=None)
        Polygon((20.4588348058, -20.6147459049), (21.3237495351, -20.597799288), (23.3295483915, -6.7036125121), (22.3183102928, -6.6746609091), align=None)
        Polygon((-29.0976695699, -9.2515230182), (-29.5553693259, -10.0814139505), (-18.5550295624, -18.6126723118), (-18.0356577191, -17.7697619811), align=None)
        Polygon((-28.0823110491, -7.4104977212), (-28.500092213, -8.1680091574), (-17.4702729283, -16.8521753098), (-16.9395810553, -15.9908932286), align=None)
    extrude(amount=-F12_DEPTH, mode=Mode.SUBTRACT)


solid = f1.part
